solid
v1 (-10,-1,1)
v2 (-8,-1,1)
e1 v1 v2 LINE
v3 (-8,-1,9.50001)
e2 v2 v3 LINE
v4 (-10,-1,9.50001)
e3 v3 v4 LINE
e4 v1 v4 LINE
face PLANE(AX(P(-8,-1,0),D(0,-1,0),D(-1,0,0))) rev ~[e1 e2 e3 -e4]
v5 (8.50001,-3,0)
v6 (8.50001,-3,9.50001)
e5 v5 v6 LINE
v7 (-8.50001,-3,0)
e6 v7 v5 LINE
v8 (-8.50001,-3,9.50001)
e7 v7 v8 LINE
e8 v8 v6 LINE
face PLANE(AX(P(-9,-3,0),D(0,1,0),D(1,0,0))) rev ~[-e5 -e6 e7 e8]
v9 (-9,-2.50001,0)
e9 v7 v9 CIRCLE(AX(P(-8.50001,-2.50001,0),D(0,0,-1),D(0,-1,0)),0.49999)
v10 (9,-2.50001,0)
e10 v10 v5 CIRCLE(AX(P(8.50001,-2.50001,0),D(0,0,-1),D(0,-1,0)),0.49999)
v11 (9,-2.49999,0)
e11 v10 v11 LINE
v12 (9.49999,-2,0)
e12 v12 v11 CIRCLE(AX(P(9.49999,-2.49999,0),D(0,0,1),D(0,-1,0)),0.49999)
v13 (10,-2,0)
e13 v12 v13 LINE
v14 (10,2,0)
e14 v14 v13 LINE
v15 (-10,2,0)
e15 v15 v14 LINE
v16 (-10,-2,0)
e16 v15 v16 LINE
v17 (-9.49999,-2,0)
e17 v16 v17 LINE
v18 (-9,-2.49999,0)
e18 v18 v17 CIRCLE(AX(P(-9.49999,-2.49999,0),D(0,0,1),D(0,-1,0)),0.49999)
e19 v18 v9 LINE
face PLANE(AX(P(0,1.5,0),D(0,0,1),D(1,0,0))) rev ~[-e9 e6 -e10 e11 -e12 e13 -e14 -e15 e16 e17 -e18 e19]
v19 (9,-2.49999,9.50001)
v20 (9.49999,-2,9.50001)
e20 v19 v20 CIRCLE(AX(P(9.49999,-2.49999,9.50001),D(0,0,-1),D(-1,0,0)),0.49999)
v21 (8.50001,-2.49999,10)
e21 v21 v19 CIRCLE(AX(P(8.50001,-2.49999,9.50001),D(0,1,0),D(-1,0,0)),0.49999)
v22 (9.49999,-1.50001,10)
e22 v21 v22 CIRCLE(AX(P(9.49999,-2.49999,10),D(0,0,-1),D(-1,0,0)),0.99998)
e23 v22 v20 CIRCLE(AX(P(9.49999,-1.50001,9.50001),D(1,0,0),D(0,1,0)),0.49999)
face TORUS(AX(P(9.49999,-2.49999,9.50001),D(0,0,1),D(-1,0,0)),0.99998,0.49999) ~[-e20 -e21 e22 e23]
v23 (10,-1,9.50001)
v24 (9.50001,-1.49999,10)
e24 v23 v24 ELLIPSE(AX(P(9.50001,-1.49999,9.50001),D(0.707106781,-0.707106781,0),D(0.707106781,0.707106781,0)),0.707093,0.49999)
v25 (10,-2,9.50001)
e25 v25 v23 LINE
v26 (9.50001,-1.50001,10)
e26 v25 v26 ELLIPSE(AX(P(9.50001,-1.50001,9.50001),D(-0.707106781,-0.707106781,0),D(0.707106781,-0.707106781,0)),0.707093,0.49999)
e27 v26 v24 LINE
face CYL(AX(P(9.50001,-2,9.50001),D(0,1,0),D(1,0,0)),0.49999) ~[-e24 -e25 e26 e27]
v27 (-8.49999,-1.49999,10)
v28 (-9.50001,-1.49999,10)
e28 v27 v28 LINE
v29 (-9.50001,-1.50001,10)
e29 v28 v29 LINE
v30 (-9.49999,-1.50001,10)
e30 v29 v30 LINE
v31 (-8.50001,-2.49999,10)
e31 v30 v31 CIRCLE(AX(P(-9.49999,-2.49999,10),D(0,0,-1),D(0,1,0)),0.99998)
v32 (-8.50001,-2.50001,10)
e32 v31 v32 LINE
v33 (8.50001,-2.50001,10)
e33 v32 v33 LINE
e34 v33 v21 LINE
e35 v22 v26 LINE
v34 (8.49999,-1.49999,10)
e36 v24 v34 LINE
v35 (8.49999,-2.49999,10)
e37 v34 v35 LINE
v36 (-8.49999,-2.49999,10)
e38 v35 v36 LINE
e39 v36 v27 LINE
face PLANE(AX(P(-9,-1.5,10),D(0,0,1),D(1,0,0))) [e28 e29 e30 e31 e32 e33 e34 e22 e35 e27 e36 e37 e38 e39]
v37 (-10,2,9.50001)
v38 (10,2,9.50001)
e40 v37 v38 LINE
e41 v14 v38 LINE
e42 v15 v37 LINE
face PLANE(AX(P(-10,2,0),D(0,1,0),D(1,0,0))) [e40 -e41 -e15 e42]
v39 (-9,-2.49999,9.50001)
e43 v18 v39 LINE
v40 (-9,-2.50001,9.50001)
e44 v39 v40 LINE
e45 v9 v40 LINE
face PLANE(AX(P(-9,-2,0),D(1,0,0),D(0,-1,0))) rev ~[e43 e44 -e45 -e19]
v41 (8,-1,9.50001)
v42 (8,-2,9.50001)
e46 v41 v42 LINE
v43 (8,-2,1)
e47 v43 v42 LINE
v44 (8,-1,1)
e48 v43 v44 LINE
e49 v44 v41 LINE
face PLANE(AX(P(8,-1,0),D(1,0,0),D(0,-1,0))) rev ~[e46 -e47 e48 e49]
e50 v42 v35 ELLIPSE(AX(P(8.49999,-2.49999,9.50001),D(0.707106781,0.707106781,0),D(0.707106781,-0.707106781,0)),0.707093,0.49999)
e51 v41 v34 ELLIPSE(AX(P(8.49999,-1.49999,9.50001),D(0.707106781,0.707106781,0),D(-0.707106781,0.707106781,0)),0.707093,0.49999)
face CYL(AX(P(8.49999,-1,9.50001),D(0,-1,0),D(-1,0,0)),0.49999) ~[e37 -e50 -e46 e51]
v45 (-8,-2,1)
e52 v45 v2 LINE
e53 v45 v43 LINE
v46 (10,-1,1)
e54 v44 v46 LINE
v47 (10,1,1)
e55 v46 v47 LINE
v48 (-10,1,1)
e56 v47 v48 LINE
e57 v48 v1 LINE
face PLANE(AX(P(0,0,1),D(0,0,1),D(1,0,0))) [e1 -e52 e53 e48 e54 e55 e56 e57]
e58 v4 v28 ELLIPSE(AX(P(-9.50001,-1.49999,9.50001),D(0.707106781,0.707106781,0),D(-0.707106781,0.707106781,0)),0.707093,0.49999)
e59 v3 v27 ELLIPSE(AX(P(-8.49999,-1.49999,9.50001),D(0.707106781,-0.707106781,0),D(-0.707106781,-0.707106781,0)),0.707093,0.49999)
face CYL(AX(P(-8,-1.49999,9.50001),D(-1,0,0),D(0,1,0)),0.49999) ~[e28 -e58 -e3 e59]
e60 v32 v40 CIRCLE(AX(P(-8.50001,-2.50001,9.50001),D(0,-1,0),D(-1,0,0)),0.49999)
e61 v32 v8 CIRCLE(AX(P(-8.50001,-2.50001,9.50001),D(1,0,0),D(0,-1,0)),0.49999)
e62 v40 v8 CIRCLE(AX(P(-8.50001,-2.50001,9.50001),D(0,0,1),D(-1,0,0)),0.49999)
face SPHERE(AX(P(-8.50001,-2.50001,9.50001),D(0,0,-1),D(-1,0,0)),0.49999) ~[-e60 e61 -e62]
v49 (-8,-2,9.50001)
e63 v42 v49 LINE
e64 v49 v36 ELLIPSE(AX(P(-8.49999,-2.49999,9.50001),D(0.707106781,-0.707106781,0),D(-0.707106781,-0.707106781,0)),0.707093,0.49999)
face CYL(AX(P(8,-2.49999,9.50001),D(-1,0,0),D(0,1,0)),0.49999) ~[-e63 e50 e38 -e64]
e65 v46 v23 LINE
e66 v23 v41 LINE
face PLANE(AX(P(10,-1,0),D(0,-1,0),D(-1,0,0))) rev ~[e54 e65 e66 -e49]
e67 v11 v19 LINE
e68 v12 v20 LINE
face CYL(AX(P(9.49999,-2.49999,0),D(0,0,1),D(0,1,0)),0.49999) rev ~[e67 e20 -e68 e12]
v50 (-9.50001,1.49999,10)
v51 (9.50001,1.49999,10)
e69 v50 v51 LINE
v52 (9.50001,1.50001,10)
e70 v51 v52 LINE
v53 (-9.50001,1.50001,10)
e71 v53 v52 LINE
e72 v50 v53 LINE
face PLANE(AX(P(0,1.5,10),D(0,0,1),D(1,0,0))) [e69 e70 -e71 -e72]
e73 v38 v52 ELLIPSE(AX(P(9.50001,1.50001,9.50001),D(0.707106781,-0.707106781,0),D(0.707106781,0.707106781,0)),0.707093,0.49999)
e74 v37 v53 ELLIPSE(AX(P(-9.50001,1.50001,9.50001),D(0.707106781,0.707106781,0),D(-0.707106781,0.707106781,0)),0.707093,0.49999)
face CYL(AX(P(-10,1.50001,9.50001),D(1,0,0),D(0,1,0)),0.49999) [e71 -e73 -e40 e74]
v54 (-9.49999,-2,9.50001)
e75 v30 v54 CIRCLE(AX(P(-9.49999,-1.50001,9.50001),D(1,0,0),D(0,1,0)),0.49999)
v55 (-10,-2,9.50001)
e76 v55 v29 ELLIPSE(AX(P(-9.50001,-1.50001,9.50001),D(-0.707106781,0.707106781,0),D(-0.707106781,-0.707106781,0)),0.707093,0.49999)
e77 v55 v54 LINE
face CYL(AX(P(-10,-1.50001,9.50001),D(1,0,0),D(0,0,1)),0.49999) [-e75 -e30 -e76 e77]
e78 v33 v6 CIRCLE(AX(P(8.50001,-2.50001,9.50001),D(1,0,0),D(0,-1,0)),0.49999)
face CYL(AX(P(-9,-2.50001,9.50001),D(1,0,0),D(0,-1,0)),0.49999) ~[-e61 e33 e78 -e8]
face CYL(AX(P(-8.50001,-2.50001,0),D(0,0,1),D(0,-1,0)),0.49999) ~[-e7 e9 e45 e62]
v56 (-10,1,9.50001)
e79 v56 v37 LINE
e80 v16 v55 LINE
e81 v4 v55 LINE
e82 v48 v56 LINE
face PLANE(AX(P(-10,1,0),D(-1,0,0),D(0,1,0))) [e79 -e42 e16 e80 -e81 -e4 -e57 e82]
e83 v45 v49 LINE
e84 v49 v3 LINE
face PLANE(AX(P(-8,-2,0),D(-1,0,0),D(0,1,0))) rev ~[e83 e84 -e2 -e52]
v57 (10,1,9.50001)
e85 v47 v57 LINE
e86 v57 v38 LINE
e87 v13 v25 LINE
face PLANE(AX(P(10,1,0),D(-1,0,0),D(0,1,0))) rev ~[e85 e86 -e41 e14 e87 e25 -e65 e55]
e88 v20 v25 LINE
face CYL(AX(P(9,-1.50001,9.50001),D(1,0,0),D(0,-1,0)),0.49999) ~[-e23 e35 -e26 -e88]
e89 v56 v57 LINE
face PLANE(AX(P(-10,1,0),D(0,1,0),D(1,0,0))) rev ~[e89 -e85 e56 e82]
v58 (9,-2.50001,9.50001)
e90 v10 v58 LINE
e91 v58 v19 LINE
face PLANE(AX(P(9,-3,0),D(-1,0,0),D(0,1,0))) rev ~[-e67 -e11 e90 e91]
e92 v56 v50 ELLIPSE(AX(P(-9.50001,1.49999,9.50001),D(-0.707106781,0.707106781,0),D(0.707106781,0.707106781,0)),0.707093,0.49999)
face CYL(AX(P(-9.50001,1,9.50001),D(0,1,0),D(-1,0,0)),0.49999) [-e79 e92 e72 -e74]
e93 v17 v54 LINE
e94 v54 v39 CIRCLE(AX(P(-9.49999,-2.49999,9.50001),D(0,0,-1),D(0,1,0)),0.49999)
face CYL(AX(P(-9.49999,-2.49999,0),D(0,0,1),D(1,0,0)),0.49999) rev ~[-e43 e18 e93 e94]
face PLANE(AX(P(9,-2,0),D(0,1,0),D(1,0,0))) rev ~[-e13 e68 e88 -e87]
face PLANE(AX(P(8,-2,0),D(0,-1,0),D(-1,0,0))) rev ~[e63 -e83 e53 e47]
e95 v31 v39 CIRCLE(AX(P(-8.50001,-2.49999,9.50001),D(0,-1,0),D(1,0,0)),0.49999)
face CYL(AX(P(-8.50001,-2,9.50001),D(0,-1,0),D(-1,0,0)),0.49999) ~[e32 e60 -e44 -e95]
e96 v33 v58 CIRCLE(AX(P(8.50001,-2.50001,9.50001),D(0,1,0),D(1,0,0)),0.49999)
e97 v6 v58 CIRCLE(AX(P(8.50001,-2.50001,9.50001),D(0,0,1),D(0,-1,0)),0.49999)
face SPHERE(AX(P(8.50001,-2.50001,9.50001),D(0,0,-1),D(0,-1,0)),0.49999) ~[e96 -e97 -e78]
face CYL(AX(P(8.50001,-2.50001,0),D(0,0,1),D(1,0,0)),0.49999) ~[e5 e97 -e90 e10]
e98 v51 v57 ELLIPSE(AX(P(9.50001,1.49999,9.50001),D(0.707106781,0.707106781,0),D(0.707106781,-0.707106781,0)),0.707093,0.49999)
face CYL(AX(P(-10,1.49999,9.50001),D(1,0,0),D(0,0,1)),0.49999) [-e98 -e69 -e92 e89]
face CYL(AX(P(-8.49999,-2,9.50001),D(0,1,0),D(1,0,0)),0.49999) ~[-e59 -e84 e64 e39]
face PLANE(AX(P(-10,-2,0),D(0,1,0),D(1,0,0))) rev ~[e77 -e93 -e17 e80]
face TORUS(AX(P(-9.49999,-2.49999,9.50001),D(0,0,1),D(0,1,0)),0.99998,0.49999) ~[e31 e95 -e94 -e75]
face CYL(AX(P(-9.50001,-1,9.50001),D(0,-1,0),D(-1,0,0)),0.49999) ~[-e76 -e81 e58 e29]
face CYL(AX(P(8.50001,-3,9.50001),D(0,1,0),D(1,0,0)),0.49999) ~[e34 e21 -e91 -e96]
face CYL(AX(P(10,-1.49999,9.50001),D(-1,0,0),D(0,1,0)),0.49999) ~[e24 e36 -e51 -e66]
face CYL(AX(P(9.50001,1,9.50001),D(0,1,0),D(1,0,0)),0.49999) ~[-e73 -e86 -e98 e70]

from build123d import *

# Parameters (mm, degrees)
F0_W     = 16
F0_H     = 1
F1_DEPTH = 1
F0_W_2   = 20
F2_DEPTH = 10
F3_R     = 0.49999


# Not quite as in the source:
# - a fillet or chamfer is up to 0.001 mm smaller than in the source, because OpenCascade refuses the exact size


with BuildPart() as f1:
    # F0 (on Top) → F1 (new body)
    with BuildSketch(Plane.XY):
        Polygon((10, 1), (-10, 1), (-10, -1), (-8, -1), (8, -1), (10, -1), align=None)
        with Locations((0, -1.5)):
            Rectangle(F0_W, F0_H)
    extrude(amount=F1_DEPTH)

    # F0 (on Top) → F2 (join)
    with BuildSketch(Plane.XY):
        with Locations((0, 1.5)):
            Rectangle(F0_W_2, F0_H)
        Polygon((-8, -1), (-10, -1), (-10, -2), (-9, -2), (-8, -2), align=None)
        Polygon((8, -2), (-8, -2), (-9, -2), (-9, -3), (9, -3), (9, -2), align=None)
        Polygon((10, -2), (10, -1), (8, -1), (8, -2), (9, -2), align=None)
    extrude(amount=F2_DEPTH)

    # F3 (radius 0.5 in the source; OpenCascade refuses exactly that, so slightly less here)
    f3_edges = [f1.edges().sort_by_distance(p)[0] for p in [
        (-9, -2, 5),
        (-9, -3, 5),
        (9, -2, 5),
        (9, -3, 5),
        (-9, -1, 10),
        (-10, -1.5, 10),
        (-9.5, -2, 10),
        (-9, -2.5, 10),
        (0, -3, 10),
        (9, -2.5, 10),
        (9.5, -2, 10),
        (10, -1.5, 10),
        (9, -1, 10),
        (8, -1.5, 10),
        (0, -2, 10),
        (-8, -1.5, 10),
        (-10, 1.5, 10),
        (0, 1, 10),
        (10, 1.5, 10),
        (0, 2, 10),
    ]]
    fillet(f3_edges, radius=F3_R)


solid = f1.part
